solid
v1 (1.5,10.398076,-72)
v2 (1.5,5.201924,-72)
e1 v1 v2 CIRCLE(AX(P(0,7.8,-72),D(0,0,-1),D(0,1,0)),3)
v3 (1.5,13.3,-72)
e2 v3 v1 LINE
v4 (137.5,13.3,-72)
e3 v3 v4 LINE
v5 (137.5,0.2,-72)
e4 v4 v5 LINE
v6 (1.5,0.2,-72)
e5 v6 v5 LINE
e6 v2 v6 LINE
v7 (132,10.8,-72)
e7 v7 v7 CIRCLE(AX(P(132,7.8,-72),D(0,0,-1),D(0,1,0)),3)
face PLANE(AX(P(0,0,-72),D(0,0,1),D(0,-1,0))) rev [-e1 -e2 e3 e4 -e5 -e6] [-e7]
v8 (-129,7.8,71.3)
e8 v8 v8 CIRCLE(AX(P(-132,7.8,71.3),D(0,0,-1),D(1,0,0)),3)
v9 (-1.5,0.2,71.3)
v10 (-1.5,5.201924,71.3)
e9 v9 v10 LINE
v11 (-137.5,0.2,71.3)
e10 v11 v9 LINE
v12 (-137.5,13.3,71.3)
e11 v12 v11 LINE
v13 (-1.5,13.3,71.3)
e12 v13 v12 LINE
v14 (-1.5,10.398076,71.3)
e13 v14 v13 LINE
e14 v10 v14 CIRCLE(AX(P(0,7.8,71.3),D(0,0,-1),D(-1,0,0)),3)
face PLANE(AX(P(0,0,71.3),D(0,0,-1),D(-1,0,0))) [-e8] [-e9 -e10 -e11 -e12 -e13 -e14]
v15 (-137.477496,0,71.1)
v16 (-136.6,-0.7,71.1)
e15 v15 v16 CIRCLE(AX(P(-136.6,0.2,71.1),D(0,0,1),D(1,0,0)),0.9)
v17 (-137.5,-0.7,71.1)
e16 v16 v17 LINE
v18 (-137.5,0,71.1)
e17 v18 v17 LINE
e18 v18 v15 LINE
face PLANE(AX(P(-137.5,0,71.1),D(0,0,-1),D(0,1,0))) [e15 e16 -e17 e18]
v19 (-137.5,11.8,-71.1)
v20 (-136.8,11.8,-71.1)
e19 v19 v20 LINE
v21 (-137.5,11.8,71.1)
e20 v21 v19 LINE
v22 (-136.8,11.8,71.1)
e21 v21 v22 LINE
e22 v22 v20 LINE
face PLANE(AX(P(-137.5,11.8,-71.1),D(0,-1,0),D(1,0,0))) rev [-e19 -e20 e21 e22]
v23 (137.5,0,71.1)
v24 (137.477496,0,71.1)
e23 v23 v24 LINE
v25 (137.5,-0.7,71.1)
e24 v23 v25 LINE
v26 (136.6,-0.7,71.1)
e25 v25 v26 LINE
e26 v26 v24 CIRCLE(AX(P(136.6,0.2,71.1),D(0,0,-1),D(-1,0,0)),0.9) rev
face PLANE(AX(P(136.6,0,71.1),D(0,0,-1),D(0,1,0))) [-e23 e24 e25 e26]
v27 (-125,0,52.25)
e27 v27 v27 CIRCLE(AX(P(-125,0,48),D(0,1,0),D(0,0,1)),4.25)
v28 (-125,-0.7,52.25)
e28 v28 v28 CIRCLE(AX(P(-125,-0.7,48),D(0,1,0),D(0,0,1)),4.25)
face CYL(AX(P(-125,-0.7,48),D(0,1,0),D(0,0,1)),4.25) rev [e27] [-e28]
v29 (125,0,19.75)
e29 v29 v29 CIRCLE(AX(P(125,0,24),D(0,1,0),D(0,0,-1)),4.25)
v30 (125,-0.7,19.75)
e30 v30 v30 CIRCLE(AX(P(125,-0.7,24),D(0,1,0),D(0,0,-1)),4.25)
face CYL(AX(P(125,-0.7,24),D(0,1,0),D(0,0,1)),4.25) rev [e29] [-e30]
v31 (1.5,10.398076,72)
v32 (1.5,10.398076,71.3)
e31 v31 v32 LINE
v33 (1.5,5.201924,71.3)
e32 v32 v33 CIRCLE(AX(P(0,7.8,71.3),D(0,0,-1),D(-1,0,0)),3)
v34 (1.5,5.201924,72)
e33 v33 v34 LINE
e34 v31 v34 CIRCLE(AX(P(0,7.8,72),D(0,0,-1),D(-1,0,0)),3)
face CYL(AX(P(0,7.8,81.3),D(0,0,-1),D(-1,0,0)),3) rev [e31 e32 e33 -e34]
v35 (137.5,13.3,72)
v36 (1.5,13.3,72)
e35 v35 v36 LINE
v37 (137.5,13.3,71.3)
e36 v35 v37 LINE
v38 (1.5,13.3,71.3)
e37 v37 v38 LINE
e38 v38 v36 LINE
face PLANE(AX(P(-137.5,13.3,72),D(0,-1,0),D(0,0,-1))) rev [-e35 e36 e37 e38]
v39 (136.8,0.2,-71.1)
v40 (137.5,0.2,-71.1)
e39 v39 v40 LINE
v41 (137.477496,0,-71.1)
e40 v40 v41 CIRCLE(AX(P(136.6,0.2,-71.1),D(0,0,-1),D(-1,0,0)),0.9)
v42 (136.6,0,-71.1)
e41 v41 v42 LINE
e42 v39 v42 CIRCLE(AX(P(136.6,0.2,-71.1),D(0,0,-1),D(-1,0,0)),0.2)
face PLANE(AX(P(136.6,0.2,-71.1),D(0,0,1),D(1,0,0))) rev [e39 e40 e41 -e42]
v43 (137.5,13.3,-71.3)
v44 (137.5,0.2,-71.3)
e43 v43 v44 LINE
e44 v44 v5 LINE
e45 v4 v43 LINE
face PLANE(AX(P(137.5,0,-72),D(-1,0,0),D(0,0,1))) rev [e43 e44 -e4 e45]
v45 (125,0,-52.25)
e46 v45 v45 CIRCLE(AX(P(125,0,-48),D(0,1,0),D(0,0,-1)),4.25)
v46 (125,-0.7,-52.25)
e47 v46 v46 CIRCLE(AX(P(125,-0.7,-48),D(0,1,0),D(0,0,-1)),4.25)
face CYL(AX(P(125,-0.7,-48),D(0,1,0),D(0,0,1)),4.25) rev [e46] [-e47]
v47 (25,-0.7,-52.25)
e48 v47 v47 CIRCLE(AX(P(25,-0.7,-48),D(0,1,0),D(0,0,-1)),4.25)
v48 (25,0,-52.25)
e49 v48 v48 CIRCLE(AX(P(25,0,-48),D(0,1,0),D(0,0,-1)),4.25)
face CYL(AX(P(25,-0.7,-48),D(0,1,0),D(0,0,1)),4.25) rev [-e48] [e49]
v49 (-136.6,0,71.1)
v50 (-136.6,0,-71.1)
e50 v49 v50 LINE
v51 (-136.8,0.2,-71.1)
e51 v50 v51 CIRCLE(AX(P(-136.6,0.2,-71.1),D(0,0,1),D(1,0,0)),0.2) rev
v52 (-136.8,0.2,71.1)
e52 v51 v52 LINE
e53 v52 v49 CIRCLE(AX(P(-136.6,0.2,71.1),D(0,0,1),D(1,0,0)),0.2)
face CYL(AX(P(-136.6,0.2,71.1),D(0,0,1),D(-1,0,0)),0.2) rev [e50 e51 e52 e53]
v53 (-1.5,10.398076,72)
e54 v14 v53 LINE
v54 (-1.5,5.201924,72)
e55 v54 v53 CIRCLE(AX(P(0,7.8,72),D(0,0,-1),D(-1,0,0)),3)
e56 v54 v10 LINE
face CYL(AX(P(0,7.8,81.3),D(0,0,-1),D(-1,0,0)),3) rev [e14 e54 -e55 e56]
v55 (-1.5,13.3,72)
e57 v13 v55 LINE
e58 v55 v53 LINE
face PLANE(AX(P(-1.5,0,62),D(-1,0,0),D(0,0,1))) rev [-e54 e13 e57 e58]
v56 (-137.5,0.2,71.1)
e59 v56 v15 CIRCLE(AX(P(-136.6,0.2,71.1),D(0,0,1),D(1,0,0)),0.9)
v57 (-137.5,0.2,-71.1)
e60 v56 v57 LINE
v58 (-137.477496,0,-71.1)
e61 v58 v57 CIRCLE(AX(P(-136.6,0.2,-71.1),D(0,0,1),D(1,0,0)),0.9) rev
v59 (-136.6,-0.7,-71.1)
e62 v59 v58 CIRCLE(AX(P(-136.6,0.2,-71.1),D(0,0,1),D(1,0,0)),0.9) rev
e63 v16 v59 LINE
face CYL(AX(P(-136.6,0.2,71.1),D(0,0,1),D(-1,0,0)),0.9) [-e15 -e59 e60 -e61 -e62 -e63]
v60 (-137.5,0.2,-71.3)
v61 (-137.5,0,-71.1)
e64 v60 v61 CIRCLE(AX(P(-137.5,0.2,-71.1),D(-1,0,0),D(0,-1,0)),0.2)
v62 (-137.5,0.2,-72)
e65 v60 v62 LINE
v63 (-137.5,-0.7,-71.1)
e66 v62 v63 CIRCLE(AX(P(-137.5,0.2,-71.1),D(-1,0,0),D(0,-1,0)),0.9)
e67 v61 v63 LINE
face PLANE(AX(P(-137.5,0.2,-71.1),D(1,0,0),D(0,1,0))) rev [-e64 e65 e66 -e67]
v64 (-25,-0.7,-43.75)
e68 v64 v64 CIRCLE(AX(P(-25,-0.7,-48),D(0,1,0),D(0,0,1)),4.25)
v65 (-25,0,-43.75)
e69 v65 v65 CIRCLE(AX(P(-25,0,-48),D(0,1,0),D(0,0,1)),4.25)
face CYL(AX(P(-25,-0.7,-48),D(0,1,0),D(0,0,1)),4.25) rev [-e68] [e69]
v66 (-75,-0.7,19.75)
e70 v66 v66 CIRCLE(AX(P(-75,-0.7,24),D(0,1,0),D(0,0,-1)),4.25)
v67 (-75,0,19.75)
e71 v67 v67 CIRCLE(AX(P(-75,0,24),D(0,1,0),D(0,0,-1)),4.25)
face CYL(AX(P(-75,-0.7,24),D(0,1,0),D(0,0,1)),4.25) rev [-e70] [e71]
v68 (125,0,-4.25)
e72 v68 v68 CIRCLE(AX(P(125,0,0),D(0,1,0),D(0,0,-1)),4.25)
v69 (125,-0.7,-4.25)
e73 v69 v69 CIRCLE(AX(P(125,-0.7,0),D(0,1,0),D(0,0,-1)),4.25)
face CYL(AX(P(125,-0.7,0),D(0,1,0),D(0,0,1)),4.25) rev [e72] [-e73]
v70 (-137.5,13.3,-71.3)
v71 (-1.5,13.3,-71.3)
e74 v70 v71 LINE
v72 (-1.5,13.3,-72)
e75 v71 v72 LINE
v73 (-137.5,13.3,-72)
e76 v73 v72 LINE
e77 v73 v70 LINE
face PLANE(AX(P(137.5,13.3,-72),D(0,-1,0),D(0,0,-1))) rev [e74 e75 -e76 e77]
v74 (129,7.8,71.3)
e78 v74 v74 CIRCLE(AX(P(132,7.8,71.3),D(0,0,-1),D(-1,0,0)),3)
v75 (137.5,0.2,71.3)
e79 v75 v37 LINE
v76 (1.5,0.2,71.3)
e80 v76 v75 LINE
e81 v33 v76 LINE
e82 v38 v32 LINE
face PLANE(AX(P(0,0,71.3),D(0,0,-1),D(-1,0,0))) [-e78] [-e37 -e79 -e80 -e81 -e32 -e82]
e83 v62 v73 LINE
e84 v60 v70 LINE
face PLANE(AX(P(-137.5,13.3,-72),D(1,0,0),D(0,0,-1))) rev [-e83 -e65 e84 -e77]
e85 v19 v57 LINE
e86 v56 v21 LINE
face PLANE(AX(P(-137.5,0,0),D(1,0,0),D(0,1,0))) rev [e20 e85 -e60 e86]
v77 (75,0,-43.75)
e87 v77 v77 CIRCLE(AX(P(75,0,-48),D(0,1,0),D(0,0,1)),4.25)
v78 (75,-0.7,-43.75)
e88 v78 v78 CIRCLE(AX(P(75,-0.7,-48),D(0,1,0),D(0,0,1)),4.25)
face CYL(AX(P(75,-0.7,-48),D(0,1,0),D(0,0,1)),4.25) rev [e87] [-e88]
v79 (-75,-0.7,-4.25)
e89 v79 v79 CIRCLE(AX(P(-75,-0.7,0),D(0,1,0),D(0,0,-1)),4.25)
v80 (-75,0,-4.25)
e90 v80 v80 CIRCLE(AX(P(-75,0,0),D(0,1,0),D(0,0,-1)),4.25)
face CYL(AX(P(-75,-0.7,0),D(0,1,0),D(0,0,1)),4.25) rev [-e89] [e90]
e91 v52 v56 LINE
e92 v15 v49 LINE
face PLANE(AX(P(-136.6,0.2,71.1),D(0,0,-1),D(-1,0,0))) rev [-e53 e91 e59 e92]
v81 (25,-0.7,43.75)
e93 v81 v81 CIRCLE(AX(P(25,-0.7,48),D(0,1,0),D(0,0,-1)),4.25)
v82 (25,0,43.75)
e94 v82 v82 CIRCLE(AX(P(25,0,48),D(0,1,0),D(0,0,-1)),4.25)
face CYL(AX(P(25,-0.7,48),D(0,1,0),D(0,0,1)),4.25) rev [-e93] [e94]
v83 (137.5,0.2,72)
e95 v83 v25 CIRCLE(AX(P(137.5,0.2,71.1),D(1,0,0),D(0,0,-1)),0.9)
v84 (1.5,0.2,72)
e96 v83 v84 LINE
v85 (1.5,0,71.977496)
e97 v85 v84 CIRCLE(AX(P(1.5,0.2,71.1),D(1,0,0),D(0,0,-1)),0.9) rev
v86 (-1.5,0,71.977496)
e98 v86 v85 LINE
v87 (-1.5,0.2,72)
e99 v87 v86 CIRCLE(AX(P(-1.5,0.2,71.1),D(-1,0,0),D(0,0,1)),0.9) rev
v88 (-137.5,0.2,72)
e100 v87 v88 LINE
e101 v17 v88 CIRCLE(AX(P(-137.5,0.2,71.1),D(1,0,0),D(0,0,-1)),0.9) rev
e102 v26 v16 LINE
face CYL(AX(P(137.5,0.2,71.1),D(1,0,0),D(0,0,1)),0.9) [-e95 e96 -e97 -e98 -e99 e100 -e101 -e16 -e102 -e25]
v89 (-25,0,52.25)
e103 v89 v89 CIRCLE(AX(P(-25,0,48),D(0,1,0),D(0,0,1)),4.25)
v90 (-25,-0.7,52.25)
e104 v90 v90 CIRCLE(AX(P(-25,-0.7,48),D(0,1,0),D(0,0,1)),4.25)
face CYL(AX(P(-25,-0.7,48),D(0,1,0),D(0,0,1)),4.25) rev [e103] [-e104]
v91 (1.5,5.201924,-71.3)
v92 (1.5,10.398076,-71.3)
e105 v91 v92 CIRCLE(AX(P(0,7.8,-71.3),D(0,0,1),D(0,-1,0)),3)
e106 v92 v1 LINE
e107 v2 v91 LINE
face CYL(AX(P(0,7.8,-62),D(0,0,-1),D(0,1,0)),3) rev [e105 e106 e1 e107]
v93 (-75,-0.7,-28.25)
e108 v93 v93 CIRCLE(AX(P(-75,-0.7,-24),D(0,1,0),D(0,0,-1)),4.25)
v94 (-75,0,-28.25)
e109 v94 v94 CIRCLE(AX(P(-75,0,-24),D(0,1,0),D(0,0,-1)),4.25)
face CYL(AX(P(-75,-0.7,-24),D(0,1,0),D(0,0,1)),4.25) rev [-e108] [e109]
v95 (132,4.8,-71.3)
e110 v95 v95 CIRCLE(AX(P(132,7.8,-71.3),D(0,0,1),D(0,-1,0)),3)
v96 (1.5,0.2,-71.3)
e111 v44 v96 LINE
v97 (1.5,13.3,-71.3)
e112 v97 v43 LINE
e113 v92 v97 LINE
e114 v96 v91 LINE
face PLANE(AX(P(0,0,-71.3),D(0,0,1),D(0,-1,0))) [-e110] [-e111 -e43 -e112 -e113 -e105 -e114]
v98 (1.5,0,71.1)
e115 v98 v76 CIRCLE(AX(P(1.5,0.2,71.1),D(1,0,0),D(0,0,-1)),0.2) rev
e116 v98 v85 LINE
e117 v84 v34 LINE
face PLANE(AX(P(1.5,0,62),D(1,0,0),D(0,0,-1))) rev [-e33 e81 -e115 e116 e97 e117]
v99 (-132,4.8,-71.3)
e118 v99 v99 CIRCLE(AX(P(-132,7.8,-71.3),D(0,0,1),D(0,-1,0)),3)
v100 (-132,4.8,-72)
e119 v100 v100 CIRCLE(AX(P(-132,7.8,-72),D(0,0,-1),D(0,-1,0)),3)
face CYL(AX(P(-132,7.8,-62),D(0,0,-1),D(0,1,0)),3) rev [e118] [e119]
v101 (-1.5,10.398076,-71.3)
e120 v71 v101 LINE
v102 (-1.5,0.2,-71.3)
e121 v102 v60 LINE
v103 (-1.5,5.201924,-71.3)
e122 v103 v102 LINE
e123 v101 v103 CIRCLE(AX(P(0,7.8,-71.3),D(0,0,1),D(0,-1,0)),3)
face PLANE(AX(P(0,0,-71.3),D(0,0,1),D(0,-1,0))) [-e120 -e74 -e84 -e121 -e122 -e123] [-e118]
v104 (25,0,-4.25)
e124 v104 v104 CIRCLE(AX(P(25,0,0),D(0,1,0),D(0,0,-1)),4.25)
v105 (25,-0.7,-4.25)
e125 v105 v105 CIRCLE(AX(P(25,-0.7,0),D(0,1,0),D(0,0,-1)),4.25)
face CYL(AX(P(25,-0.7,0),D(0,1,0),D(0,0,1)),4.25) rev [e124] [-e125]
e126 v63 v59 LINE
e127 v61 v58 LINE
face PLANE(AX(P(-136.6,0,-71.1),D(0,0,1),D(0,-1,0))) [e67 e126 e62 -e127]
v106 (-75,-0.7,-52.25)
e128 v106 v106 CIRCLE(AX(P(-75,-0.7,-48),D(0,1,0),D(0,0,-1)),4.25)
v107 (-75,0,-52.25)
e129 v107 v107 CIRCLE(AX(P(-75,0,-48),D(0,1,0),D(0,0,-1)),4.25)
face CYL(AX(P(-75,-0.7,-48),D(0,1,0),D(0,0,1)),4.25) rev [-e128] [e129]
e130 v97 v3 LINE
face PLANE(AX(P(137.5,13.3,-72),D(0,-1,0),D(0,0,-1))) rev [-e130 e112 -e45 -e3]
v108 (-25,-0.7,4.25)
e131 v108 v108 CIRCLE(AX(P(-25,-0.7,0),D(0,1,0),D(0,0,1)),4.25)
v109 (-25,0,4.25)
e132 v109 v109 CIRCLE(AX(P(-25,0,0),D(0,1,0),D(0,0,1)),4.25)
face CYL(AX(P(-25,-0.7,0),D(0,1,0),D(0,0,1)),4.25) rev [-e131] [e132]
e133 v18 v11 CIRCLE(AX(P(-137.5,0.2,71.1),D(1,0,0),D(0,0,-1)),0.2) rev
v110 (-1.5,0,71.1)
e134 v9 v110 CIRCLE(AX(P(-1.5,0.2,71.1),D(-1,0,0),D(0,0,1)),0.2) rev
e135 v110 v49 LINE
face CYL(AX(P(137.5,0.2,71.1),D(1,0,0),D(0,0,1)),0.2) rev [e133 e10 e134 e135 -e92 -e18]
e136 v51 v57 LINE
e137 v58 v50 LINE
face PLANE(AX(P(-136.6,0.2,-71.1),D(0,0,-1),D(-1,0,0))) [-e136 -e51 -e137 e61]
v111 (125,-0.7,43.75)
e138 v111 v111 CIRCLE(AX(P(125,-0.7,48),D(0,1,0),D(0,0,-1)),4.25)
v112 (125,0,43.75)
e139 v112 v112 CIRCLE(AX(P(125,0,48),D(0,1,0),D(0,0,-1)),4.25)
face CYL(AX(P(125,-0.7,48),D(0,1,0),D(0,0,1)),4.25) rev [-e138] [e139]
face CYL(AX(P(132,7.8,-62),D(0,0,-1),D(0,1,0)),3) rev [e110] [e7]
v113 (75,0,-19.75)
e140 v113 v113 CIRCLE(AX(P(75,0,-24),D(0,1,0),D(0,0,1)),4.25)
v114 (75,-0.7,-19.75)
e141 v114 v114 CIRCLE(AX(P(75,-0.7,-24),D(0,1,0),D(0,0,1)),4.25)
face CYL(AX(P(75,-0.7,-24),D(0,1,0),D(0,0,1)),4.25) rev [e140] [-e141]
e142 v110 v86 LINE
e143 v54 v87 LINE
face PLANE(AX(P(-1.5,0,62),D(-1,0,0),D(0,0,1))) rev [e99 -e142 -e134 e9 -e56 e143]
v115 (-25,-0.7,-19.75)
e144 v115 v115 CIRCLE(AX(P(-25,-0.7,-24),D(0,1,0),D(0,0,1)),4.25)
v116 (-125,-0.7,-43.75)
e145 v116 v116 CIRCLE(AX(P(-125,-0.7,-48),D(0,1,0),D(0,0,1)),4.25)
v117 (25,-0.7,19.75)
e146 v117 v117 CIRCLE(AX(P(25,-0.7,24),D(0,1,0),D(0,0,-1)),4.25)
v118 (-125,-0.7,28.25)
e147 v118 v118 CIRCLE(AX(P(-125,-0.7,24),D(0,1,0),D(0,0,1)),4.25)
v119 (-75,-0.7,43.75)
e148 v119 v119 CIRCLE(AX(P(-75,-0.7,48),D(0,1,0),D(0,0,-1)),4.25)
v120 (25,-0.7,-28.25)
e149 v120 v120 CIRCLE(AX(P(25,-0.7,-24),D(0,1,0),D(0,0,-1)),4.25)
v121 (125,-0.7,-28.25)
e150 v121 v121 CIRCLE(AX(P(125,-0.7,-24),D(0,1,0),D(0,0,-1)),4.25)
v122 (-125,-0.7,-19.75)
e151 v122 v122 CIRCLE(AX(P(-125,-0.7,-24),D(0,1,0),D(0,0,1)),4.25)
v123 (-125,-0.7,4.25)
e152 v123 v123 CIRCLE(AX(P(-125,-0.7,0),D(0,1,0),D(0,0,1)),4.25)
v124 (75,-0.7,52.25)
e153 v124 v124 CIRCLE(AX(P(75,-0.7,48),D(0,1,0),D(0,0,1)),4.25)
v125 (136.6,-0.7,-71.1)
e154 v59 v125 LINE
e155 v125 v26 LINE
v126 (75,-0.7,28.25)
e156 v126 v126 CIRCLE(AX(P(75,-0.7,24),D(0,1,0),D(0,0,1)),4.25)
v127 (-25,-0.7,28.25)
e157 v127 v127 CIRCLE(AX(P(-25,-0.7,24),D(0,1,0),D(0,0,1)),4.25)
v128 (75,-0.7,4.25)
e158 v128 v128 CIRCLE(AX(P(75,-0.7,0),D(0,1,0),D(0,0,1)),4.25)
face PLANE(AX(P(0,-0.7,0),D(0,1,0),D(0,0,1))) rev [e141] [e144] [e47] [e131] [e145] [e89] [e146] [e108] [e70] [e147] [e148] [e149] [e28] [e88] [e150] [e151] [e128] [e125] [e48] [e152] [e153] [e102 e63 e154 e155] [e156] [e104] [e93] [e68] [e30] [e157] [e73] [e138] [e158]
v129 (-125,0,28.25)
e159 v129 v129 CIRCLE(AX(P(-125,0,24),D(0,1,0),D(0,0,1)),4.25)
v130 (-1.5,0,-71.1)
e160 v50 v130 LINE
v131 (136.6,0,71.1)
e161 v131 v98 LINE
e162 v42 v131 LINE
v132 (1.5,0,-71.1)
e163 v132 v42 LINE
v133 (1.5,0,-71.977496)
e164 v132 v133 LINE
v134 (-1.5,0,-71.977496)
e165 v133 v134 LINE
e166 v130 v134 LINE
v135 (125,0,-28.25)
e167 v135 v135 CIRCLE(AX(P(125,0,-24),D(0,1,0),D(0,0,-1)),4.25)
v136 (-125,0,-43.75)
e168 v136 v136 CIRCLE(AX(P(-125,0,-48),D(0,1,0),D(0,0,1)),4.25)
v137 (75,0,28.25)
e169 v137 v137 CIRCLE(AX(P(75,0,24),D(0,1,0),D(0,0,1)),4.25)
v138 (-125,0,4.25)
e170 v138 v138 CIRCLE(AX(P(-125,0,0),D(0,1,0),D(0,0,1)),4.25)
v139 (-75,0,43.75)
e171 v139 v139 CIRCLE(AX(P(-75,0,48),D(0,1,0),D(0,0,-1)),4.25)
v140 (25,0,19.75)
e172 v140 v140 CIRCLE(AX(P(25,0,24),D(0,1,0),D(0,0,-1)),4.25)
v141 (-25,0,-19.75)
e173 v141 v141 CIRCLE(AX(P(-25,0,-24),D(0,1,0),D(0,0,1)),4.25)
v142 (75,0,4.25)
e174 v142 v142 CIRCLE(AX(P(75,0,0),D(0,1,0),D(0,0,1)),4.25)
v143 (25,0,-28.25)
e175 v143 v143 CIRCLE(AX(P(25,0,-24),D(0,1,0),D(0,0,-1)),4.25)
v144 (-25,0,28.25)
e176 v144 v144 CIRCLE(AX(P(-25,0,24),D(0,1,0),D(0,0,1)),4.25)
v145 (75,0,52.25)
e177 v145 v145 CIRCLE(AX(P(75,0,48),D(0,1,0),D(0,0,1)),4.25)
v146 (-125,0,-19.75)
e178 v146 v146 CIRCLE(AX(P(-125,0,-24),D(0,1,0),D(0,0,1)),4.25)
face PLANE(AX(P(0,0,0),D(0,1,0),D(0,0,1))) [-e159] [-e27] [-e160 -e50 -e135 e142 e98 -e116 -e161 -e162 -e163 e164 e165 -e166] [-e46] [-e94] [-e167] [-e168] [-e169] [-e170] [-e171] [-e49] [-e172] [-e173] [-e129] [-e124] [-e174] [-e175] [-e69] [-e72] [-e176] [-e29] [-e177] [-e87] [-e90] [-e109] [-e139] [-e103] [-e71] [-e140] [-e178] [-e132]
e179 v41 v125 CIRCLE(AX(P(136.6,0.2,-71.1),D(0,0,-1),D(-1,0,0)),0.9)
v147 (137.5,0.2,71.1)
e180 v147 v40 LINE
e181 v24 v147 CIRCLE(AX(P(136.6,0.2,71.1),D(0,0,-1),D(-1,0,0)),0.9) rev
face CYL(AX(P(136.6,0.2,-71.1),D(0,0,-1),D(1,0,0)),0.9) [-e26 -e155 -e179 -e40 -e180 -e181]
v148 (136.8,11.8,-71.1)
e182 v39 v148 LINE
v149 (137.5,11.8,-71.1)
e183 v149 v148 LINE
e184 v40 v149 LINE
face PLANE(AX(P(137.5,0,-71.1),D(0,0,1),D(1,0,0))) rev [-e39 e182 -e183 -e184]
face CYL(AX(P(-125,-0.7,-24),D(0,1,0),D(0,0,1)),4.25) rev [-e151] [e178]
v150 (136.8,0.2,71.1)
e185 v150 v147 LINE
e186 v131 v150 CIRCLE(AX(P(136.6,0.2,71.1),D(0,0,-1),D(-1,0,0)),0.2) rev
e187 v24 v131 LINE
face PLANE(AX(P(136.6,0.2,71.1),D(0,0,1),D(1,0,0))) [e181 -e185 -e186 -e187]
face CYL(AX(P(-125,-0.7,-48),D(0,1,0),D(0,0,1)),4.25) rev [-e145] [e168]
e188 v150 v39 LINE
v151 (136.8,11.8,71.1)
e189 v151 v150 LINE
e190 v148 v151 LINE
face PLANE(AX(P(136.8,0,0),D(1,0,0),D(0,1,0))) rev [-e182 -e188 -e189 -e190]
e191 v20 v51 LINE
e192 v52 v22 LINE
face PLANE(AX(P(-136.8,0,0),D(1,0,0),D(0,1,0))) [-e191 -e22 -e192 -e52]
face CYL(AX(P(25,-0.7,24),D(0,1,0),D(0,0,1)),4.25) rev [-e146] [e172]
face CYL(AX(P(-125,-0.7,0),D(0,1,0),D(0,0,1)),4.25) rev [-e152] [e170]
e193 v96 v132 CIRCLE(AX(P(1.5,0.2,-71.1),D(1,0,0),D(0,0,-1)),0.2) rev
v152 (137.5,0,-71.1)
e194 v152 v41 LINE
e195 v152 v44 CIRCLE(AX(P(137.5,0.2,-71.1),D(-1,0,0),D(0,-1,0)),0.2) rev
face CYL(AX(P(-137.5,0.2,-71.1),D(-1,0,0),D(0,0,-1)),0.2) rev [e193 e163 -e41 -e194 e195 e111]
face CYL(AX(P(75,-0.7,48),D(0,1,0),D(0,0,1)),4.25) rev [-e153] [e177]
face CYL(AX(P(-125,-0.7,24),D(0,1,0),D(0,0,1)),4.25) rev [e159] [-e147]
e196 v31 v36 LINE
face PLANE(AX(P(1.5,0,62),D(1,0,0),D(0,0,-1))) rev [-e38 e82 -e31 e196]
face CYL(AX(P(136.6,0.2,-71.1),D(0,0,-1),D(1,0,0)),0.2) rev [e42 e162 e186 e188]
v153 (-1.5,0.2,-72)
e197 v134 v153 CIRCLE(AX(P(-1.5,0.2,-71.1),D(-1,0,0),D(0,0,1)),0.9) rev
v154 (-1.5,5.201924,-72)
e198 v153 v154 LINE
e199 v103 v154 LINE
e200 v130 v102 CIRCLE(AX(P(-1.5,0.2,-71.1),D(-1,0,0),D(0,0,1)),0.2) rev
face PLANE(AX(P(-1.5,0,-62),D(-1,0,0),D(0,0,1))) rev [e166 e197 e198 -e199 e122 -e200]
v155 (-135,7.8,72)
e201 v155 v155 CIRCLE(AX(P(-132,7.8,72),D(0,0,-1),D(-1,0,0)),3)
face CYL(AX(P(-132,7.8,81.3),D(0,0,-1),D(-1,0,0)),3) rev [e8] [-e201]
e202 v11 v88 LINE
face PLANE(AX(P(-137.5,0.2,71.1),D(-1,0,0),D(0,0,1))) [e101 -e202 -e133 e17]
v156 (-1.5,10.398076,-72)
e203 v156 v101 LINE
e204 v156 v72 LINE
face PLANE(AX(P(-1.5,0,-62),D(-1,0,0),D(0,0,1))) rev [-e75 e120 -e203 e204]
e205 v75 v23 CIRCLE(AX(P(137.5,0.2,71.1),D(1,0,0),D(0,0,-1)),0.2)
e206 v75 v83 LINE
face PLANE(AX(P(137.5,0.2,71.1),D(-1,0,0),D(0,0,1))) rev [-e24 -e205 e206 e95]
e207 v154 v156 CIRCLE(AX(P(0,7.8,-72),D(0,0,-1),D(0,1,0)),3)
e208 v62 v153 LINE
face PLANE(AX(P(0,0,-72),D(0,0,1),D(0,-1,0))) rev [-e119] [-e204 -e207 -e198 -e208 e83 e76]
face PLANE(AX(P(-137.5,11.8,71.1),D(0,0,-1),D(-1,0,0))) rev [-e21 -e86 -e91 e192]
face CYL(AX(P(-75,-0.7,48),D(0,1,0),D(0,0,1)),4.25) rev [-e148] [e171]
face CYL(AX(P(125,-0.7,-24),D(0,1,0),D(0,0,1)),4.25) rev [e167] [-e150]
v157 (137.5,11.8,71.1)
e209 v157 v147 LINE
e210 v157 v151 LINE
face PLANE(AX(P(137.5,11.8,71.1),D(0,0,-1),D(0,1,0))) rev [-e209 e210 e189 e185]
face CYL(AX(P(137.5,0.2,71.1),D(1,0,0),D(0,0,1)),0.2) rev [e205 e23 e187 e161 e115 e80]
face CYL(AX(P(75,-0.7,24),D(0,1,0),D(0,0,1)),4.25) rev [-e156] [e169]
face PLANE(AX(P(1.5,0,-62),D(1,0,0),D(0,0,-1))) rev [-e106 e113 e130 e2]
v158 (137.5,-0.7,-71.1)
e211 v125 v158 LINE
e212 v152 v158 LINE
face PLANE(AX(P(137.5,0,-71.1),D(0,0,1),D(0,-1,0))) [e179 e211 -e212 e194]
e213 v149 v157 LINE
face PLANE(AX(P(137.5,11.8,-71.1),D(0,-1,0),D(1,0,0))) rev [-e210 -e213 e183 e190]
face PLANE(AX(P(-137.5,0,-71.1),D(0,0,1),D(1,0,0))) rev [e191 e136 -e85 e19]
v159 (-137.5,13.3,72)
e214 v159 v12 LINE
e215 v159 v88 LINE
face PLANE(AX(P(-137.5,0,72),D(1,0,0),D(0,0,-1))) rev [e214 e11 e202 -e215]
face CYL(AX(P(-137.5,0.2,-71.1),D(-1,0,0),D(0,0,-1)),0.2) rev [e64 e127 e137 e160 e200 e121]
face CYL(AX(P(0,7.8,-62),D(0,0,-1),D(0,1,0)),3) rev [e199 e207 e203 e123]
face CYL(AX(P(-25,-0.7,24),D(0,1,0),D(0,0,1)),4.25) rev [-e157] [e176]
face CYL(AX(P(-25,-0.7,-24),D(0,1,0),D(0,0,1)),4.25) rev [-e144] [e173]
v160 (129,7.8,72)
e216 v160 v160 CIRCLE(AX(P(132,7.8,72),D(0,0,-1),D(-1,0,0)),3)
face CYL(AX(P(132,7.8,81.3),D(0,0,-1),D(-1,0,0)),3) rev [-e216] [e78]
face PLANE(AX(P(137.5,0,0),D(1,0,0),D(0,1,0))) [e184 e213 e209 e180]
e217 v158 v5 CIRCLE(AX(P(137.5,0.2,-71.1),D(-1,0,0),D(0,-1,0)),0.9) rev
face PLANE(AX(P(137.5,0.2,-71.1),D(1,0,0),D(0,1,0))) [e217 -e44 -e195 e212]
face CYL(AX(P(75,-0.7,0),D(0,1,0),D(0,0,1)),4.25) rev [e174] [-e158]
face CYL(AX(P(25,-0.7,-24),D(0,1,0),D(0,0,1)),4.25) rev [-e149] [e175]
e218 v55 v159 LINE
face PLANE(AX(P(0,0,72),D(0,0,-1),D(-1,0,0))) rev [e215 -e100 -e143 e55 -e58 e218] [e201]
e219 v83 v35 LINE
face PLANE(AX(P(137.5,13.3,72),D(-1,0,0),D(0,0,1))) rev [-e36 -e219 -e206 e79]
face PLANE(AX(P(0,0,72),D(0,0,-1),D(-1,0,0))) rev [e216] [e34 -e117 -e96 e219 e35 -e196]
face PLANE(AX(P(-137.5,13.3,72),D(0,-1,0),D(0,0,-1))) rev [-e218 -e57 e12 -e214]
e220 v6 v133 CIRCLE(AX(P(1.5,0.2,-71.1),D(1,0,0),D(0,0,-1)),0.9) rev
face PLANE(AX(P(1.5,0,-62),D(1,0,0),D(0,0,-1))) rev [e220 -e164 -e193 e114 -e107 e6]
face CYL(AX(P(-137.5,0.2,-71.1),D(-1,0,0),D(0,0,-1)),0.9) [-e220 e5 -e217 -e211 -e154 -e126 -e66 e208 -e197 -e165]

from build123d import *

# Parameters (mm, degrees)
SKETCH_1_W                         = 275
SKETCH_1_H                         = 144
SKETCH_1_R                         = 4.25
SM_BASE_FLANGE_1_DEPTH             = 0.7
SM_EDGE_FLANGE_1_STRIP_W           = 3.2
SM_EDGE_FLANGE_1_STRIP_H           = 0.7
SM_EDGE_FLANGE_1_STRIP_CUT_DEPTH   = 275
SM_EDGE_FLANGE_1_STRIP_2_W         = 3.2
SM_EDGE_FLANGE_1_STRIP_2_H         = 0.7
SM_EDGE_FLANGE_1_STRIP_CUT_2_DEPTH = 275
SM_EDGE_FLANGE_1_DEPTH             = 275
SM_EDGE_FLANGE_1_BEND_DEPTH        = 275
SKETCH_14_R                        = 3
CUT_EXTRUDE_1_DEPTH                = 10
SKETCH_15_R                        = 3
CUT_EXTRUDE_2_DEPTH                = 10
SKETCH_16_W                        = 3
SKETCH_16_H                        = 13.3
CUT_EXTRUDE_3_DEPTH                = 10
SKETCH_17_W                        = 3
SKETCH_17_H                        = 13.3
CUT_EXTRUDE_4_DEPTH                = 10
SM_EDGE_FLANGE_2_STRIP_W           = 3.2
SM_EDGE_FLANGE_2_STRIP_H           = 0.7
SM_EDGE_FLANGE_2_STRIP_CUT_DEPTH   = 142.2
SM_EDGE_FLANGE_2_STRIP_2_W         = 3.2
SM_EDGE_FLANGE_2_STRIP_2_H         = 0.7
SM_EDGE_FLANGE_2_STRIP_CUT_2_DEPTH = 142.2
SM_EDGE_FLANGE_2_DEPTH             = 142.2
SM_EDGE_FLANGE_2_BEND_DEPTH        = 142.2


# Sheet-metal steps are written as plain solids
with BuildPart() as part:
    # Sketch 1 → 基体-法兰1 (new body)
    with BuildSketch(Plane(origin=(0, 0, 0), x_dir=(1, 0, 0), z_dir=(0, 1, 0))):
        Rectangle(SKETCH_1_W, SKETCH_1_H)
        with Locations(Location((-125, -48, 0), (0, 0, 270))):
            Circle(SKETCH_1_R, mode=Mode.SUBTRACT)
        with Locations(Location((-125, -24, 0), (0, 0, 270))):
            Circle(SKETCH_1_R, mode=Mode.SUBTRACT)
        with Locations(Location((-125, 0, 0), (0, 0, 270))):
            Circle(SKETCH_1_R, mode=Mode.SUBTRACT)
        with Locations(Location((-125, 24, 0), (0, 0, 270))):
            Circle(SKETCH_1_R, mode=Mode.SUBTRACT)
        with Locations(Location((-125, 48, 0), (0, 0, 270))):
            Circle(SKETCH_1_R, mode=Mode.SUBTRACT)
        with Locations(Location((-75, -48, 0), (0, 0, 90))):
            Circle(SKETCH_1_R, mode=Mode.SUBTRACT)
        with Locations(Location((-75, -24, 0), (0, 0, 90))):
            Circle(SKETCH_1_R, mode=Mode.SUBTRACT)
        with Locations(Location((-75, 0, 0), (0, 0, 90))):
            Circle(SKETCH_1_R, mode=Mode.SUBTRACT)
        with Locations(Location((-75, 24, 0), (0, 0, 90))):
            Circle(SKETCH_1_R, mode=Mode.SUBTRACT)
        with Locations(Location((-75, 48, 0), (0, 0, 90))):
            Circle(SKETCH_1_R, mode=Mode.SUBTRACT)
        with Locations(Location((-25, -48, 0), (0, 0, 270))):
            Circle(SKETCH_1_R, mode=Mode.SUBTRACT)
        with Locations(Location((-25, -24, 0), (0, 0, 270))):
            Circle(SKETCH_1_R, mode=Mode.SUBTRACT)
        with Locations(Location((-25, 0, 0), (0, 0, 270))):
            Circle(SKETCH_1_R, mode=Mode.SUBTRACT)
        with Locations(Location((-25, 24, 0), (0, 0, 270))):
            Circle(SKETCH_1_R, mode=Mode.SUBTRACT)
        with Locations(Location((-25, 48, 0), (0, 0, 270))):
            Circle(SKETCH_1_R, mode=Mode.SUBTRACT)
        with Locations(Location((25, -48, 0), (0, 0, 90))):
            Circle(SKETCH_1_R, mode=Mode.SUBTRACT)
        with Locations(Location((25, -24, 0), (0, 0, 90))):
            Circle(SKETCH_1_R, mode=Mode.SUBTRACT)
        with Locations(Location((25, 0, 0), (0, 0, 90))):
            Circle(SKETCH_1_R, mode=Mode.SUBTRACT)
        with Locations(Location((25, 24, 0), (0, 0, 90))):
            Circle(SKETCH_1_R, mode=Mode.SUBTRACT)
        with Locations(Location((25, 48, 0), (0, 0, 90))):
            Circle(SKETCH_1_R, mode=Mode.SUBTRACT)
        with Locations(Location((75, 48, 0), (0, 0, 270))):
            Circle(SKETCH_1_R, mode=Mode.SUBTRACT)
        with Locations(Location((75, 24, 0), (0, 0, 270))):
            Circle(SKETCH_1_R, mode=Mode.SUBTRACT)
        with Locations(Location((75, 0, 0), (0, 0, 270))):
            Circle(SKETCH_1_R, mode=Mode.SUBTRACT)
        with Locations(Location((75, -24, 0), (0, 0, 270))):
            Circle(SKETCH_1_R, mode=Mode.SUBTRACT)
        with Locations(Location((75, -48, 0), (0, 0, 270))):
            Circle(SKETCH_1_R, mode=Mode.SUBTRACT)
        with Locations(Location((125, -48, 0), (0, 0, 90))):
            Circle(SKETCH_1_R, mode=Mode.SUBTRACT)
        with Locations(Location((125, -24, 0), (0, 0, 90))):
            Circle(SKETCH_1_R, mode=Mode.SUBTRACT)
        with Locations(Location((125, 0, 0), (0, 0, 90))):
            Circle(SKETCH_1_R, mode=Mode.SUBTRACT)
        with Locations(Location((125, 24, 0), (0, 0, 90))):
            Circle(SKETCH_1_R, mode=Mode.SUBTRACT)
        with Locations(Location((125, 48, 0), (0, 0, 90))):
            Circle(SKETCH_1_R, mode=Mode.SUBTRACT)
    extrude(amount=-SM_BASE_FLANGE_1_DEPTH)

    # 边线-法兰1 strip (across the edge) → 边线-法兰1 strip cut (cut)
    with BuildSketch(Plane(origin=(-137.5, 0, 72), x_dir=(0, 0, -1), z_dir=(1, 0, 0))):
        with Locations((-0.7, -0.35)):
            Rectangle(SM_EDGE_FLANGE_1_STRIP_W, SM_EDGE_FLANGE_1_STRIP_H)
    extrude(amount=SM_EDGE_FLANGE_1_STRIP_CUT_DEPTH, mode=Mode.SUBTRACT)

    # 边线-法兰1 strip 2 (across the edge) → 边线-法兰1 strip cut 2 (cut)
    with BuildSketch(Plane(origin=(137.5, 0, -72), x_dir=(0, 0, 1), z_dir=(-1, 0, 0))):
        with Locations((-0.7, -0.35)):
            Rectangle(SM_EDGE_FLANGE_1_STRIP_2_W, SM_EDGE_FLANGE_1_STRIP_2_H)
    extrude(amount=SM_EDGE_FLANGE_1_STRIP_CUT_2_DEPTH, mode=Mode.SUBTRACT)

    # 边线-法兰1 section (across the edge) → 边线-法兰1 (add)
    with BuildSketch(Plane(origin=(-137.5, 0, 72), x_dir=(0, 0, -1), z_dir=(1, 0, 0))):
        with BuildLine():
            Line((0, 0.2), (0, 13.3))
            Line((0, 13.3), (0.7, 13.3))
            Line((0.7, 13.3), (0.7, 0.2))
            ThreePointArc((0.7, 0.2), (0.758578644, 0.058578644), (0.9, 0))
            Line((0.9, 0), (0.9, -0.7))
            ThreePointArc((0.9, -0.7), (0.263603897, -0.436396103), (0, 0.2))
        make_face()
    extrude(amount=SM_EDGE_FLANGE_1_DEPTH)

    # 边线-法兰1 section 2 (across the edge) → 边线-法兰1 bend (add)
    with BuildSketch(Plane(origin=(137.5, 0, -72), x_dir=(0, 0, 1), z_dir=(-1, 0, 0))):
        with BuildLine():
            Line((0, 0.2), (0, 13.3))
            Line((0, 13.3), (0.7, 13.3))
            Line((0.7, 13.3), (0.7, 0.2))
            ThreePointArc((0.7, 0.2), (0.758578644, 0.058578644), (0.9, 0))
            Line((0.9, 0), (0.9, -0.7))
            ThreePointArc((0.9, -0.7), (0.263603897, -0.436396103), (0, 0.2))
        make_face()
    extrude(amount=SM_EDGE_FLANGE_1_BEND_DEPTH)

    # 草图14 → 切除-拉伸1 (cut)
    with BuildSketch(Plane(origin=(0, 0, 71.3), x_dir=(-1, 0, 0), z_dir=(0, 0, -1))):
        with Locations((-132, 7.8)):
            Circle(SKETCH_14_R)
        with Locations((0, 7.8)):
            Circle(SKETCH_14_R)
        with Locations((132, 7.8)):
            Circle(SKETCH_14_R)
    extrude(amount=-CUT_EXTRUDE_1_DEPTH, mode=Mode.SUBTRACT)

    # 草图15 → 切除-拉伸2 (cut)
    with BuildSketch(Plane(origin=(0, 0, -72), x_dir=(-1, 0, 0), z_dir=(0, 0, -1))):
        with Locations((-132, 7.8)):
            Circle(SKETCH_15_R)
        with Locations((0, 7.8)):
            Circle(SKETCH_15_R)
        with Locations((132, 7.8)):
            Circle(SKETCH_15_R)
    extrude(amount=-CUT_EXTRUDE_2_DEPTH, mode=Mode.SUBTRACT)

    # 草图16 → 切除-拉伸3 (cut)
    with BuildSketch(Plane(origin=(0, 0, -72), x_dir=(-1, 0, 0), z_dir=(0, 0, -1))):
        with Locations((0, 6.65)):
            Rectangle(SKETCH_16_W, SKETCH_16_H)
    extrude(amount=-CUT_EXTRUDE_3_DEPTH, mode=Mode.SUBTRACT)

    # 草图17 → 切除-拉伸4 (cut)
    with BuildSketch(Plane.XY.offset(72)):
        with Locations((0, 6.65)):
            Rectangle(SKETCH_17_W, SKETCH_17_H)
    extrude(amount=-CUT_EXTRUDE_4_DEPTH, mode=Mode.SUBTRACT)

    # 边线-法兰2 strip (across the edge) → 边线-法兰2 strip cut (cut)
    with BuildSketch(Plane(origin=(-137.5, 0, -71.1), x_dir=(1, 0, 0), z_dir=(0, 0, 1))):
        with Locations((-0.7, -0.35)):
            Rectangle(SM_EDGE_FLANGE_2_STRIP_W, SM_EDGE_FLANGE_2_STRIP_H)
    extrude(amount=SM_EDGE_FLANGE_2_STRIP_CUT_DEPTH, mode=Mode.SUBTRACT)

    # 边线-法兰2 strip 2 (across the edge) → 边线-法兰2 strip cut 2 (cut)
    with BuildSketch(Plane(origin=(137.5, 0, 71.1), x_dir=(-1, 0, 0), z_dir=(0, 0, -1))):
        with Locations((-0.7, -0.35)):
            Rectangle(SM_EDGE_FLANGE_2_STRIP_2_W, SM_EDGE_FLANGE_2_STRIP_2_H)
    extrude(amount=SM_EDGE_FLANGE_2_STRIP_CUT_2_DEPTH, mode=Mode.SUBTRACT)

    # 边线-法兰2 section (across the edge) → 边线-法兰2 (add)
    with BuildSketch(Plane(origin=(-137.5, 0, -71.1), x_dir=(1, 0, 0), z_dir=(0, 0, 1))):
        with BuildLine():
            Line((0, 0.2), (0, 11.8))
            Line((0, 11.8), (0.7, 11.8))
            Line((0.7, 11.8), (0.7, 0.2))
            ThreePointArc((0.7, 0.2), (0.758578644, 0.058578644), (0.9, 0))
            Line((0.9, 0), (0.9, -0.7))
            ThreePointArc((0.9, -0.7), (0.263603897, -0.436396103), (0, 0.2))
        make_face()
    extrude(amount=SM_EDGE_FLANGE_2_DEPTH)

    # 边线-法兰2 section 2 (across the edge) → 边线-法兰2 bend (add)
    with BuildSketch(Plane(origin=(137.5, 0, 71.1), x_dir=(-1, 0, 0), z_dir=(0, 0, -1))):
        with BuildLine():
            Line((0, 0.2), (0, 11.8))
            Line((0, 11.8), (0.7, 11.8))
            Line((0.7, 11.8), (0.7, 0.2))
            ThreePointArc((0.7, 0.2), (0.758578644, 0.058578644), (0.9, 0))
            Line((0.9, 0), (0.9, -0.7))
            ThreePointArc((0.9, -0.7), (0.263603897, -0.436396103), (0, 0.2))
        make_face()
    extrude(amount=SM_EDGE_FLANGE_2_BEND_DEPTH)


solid = part.part
